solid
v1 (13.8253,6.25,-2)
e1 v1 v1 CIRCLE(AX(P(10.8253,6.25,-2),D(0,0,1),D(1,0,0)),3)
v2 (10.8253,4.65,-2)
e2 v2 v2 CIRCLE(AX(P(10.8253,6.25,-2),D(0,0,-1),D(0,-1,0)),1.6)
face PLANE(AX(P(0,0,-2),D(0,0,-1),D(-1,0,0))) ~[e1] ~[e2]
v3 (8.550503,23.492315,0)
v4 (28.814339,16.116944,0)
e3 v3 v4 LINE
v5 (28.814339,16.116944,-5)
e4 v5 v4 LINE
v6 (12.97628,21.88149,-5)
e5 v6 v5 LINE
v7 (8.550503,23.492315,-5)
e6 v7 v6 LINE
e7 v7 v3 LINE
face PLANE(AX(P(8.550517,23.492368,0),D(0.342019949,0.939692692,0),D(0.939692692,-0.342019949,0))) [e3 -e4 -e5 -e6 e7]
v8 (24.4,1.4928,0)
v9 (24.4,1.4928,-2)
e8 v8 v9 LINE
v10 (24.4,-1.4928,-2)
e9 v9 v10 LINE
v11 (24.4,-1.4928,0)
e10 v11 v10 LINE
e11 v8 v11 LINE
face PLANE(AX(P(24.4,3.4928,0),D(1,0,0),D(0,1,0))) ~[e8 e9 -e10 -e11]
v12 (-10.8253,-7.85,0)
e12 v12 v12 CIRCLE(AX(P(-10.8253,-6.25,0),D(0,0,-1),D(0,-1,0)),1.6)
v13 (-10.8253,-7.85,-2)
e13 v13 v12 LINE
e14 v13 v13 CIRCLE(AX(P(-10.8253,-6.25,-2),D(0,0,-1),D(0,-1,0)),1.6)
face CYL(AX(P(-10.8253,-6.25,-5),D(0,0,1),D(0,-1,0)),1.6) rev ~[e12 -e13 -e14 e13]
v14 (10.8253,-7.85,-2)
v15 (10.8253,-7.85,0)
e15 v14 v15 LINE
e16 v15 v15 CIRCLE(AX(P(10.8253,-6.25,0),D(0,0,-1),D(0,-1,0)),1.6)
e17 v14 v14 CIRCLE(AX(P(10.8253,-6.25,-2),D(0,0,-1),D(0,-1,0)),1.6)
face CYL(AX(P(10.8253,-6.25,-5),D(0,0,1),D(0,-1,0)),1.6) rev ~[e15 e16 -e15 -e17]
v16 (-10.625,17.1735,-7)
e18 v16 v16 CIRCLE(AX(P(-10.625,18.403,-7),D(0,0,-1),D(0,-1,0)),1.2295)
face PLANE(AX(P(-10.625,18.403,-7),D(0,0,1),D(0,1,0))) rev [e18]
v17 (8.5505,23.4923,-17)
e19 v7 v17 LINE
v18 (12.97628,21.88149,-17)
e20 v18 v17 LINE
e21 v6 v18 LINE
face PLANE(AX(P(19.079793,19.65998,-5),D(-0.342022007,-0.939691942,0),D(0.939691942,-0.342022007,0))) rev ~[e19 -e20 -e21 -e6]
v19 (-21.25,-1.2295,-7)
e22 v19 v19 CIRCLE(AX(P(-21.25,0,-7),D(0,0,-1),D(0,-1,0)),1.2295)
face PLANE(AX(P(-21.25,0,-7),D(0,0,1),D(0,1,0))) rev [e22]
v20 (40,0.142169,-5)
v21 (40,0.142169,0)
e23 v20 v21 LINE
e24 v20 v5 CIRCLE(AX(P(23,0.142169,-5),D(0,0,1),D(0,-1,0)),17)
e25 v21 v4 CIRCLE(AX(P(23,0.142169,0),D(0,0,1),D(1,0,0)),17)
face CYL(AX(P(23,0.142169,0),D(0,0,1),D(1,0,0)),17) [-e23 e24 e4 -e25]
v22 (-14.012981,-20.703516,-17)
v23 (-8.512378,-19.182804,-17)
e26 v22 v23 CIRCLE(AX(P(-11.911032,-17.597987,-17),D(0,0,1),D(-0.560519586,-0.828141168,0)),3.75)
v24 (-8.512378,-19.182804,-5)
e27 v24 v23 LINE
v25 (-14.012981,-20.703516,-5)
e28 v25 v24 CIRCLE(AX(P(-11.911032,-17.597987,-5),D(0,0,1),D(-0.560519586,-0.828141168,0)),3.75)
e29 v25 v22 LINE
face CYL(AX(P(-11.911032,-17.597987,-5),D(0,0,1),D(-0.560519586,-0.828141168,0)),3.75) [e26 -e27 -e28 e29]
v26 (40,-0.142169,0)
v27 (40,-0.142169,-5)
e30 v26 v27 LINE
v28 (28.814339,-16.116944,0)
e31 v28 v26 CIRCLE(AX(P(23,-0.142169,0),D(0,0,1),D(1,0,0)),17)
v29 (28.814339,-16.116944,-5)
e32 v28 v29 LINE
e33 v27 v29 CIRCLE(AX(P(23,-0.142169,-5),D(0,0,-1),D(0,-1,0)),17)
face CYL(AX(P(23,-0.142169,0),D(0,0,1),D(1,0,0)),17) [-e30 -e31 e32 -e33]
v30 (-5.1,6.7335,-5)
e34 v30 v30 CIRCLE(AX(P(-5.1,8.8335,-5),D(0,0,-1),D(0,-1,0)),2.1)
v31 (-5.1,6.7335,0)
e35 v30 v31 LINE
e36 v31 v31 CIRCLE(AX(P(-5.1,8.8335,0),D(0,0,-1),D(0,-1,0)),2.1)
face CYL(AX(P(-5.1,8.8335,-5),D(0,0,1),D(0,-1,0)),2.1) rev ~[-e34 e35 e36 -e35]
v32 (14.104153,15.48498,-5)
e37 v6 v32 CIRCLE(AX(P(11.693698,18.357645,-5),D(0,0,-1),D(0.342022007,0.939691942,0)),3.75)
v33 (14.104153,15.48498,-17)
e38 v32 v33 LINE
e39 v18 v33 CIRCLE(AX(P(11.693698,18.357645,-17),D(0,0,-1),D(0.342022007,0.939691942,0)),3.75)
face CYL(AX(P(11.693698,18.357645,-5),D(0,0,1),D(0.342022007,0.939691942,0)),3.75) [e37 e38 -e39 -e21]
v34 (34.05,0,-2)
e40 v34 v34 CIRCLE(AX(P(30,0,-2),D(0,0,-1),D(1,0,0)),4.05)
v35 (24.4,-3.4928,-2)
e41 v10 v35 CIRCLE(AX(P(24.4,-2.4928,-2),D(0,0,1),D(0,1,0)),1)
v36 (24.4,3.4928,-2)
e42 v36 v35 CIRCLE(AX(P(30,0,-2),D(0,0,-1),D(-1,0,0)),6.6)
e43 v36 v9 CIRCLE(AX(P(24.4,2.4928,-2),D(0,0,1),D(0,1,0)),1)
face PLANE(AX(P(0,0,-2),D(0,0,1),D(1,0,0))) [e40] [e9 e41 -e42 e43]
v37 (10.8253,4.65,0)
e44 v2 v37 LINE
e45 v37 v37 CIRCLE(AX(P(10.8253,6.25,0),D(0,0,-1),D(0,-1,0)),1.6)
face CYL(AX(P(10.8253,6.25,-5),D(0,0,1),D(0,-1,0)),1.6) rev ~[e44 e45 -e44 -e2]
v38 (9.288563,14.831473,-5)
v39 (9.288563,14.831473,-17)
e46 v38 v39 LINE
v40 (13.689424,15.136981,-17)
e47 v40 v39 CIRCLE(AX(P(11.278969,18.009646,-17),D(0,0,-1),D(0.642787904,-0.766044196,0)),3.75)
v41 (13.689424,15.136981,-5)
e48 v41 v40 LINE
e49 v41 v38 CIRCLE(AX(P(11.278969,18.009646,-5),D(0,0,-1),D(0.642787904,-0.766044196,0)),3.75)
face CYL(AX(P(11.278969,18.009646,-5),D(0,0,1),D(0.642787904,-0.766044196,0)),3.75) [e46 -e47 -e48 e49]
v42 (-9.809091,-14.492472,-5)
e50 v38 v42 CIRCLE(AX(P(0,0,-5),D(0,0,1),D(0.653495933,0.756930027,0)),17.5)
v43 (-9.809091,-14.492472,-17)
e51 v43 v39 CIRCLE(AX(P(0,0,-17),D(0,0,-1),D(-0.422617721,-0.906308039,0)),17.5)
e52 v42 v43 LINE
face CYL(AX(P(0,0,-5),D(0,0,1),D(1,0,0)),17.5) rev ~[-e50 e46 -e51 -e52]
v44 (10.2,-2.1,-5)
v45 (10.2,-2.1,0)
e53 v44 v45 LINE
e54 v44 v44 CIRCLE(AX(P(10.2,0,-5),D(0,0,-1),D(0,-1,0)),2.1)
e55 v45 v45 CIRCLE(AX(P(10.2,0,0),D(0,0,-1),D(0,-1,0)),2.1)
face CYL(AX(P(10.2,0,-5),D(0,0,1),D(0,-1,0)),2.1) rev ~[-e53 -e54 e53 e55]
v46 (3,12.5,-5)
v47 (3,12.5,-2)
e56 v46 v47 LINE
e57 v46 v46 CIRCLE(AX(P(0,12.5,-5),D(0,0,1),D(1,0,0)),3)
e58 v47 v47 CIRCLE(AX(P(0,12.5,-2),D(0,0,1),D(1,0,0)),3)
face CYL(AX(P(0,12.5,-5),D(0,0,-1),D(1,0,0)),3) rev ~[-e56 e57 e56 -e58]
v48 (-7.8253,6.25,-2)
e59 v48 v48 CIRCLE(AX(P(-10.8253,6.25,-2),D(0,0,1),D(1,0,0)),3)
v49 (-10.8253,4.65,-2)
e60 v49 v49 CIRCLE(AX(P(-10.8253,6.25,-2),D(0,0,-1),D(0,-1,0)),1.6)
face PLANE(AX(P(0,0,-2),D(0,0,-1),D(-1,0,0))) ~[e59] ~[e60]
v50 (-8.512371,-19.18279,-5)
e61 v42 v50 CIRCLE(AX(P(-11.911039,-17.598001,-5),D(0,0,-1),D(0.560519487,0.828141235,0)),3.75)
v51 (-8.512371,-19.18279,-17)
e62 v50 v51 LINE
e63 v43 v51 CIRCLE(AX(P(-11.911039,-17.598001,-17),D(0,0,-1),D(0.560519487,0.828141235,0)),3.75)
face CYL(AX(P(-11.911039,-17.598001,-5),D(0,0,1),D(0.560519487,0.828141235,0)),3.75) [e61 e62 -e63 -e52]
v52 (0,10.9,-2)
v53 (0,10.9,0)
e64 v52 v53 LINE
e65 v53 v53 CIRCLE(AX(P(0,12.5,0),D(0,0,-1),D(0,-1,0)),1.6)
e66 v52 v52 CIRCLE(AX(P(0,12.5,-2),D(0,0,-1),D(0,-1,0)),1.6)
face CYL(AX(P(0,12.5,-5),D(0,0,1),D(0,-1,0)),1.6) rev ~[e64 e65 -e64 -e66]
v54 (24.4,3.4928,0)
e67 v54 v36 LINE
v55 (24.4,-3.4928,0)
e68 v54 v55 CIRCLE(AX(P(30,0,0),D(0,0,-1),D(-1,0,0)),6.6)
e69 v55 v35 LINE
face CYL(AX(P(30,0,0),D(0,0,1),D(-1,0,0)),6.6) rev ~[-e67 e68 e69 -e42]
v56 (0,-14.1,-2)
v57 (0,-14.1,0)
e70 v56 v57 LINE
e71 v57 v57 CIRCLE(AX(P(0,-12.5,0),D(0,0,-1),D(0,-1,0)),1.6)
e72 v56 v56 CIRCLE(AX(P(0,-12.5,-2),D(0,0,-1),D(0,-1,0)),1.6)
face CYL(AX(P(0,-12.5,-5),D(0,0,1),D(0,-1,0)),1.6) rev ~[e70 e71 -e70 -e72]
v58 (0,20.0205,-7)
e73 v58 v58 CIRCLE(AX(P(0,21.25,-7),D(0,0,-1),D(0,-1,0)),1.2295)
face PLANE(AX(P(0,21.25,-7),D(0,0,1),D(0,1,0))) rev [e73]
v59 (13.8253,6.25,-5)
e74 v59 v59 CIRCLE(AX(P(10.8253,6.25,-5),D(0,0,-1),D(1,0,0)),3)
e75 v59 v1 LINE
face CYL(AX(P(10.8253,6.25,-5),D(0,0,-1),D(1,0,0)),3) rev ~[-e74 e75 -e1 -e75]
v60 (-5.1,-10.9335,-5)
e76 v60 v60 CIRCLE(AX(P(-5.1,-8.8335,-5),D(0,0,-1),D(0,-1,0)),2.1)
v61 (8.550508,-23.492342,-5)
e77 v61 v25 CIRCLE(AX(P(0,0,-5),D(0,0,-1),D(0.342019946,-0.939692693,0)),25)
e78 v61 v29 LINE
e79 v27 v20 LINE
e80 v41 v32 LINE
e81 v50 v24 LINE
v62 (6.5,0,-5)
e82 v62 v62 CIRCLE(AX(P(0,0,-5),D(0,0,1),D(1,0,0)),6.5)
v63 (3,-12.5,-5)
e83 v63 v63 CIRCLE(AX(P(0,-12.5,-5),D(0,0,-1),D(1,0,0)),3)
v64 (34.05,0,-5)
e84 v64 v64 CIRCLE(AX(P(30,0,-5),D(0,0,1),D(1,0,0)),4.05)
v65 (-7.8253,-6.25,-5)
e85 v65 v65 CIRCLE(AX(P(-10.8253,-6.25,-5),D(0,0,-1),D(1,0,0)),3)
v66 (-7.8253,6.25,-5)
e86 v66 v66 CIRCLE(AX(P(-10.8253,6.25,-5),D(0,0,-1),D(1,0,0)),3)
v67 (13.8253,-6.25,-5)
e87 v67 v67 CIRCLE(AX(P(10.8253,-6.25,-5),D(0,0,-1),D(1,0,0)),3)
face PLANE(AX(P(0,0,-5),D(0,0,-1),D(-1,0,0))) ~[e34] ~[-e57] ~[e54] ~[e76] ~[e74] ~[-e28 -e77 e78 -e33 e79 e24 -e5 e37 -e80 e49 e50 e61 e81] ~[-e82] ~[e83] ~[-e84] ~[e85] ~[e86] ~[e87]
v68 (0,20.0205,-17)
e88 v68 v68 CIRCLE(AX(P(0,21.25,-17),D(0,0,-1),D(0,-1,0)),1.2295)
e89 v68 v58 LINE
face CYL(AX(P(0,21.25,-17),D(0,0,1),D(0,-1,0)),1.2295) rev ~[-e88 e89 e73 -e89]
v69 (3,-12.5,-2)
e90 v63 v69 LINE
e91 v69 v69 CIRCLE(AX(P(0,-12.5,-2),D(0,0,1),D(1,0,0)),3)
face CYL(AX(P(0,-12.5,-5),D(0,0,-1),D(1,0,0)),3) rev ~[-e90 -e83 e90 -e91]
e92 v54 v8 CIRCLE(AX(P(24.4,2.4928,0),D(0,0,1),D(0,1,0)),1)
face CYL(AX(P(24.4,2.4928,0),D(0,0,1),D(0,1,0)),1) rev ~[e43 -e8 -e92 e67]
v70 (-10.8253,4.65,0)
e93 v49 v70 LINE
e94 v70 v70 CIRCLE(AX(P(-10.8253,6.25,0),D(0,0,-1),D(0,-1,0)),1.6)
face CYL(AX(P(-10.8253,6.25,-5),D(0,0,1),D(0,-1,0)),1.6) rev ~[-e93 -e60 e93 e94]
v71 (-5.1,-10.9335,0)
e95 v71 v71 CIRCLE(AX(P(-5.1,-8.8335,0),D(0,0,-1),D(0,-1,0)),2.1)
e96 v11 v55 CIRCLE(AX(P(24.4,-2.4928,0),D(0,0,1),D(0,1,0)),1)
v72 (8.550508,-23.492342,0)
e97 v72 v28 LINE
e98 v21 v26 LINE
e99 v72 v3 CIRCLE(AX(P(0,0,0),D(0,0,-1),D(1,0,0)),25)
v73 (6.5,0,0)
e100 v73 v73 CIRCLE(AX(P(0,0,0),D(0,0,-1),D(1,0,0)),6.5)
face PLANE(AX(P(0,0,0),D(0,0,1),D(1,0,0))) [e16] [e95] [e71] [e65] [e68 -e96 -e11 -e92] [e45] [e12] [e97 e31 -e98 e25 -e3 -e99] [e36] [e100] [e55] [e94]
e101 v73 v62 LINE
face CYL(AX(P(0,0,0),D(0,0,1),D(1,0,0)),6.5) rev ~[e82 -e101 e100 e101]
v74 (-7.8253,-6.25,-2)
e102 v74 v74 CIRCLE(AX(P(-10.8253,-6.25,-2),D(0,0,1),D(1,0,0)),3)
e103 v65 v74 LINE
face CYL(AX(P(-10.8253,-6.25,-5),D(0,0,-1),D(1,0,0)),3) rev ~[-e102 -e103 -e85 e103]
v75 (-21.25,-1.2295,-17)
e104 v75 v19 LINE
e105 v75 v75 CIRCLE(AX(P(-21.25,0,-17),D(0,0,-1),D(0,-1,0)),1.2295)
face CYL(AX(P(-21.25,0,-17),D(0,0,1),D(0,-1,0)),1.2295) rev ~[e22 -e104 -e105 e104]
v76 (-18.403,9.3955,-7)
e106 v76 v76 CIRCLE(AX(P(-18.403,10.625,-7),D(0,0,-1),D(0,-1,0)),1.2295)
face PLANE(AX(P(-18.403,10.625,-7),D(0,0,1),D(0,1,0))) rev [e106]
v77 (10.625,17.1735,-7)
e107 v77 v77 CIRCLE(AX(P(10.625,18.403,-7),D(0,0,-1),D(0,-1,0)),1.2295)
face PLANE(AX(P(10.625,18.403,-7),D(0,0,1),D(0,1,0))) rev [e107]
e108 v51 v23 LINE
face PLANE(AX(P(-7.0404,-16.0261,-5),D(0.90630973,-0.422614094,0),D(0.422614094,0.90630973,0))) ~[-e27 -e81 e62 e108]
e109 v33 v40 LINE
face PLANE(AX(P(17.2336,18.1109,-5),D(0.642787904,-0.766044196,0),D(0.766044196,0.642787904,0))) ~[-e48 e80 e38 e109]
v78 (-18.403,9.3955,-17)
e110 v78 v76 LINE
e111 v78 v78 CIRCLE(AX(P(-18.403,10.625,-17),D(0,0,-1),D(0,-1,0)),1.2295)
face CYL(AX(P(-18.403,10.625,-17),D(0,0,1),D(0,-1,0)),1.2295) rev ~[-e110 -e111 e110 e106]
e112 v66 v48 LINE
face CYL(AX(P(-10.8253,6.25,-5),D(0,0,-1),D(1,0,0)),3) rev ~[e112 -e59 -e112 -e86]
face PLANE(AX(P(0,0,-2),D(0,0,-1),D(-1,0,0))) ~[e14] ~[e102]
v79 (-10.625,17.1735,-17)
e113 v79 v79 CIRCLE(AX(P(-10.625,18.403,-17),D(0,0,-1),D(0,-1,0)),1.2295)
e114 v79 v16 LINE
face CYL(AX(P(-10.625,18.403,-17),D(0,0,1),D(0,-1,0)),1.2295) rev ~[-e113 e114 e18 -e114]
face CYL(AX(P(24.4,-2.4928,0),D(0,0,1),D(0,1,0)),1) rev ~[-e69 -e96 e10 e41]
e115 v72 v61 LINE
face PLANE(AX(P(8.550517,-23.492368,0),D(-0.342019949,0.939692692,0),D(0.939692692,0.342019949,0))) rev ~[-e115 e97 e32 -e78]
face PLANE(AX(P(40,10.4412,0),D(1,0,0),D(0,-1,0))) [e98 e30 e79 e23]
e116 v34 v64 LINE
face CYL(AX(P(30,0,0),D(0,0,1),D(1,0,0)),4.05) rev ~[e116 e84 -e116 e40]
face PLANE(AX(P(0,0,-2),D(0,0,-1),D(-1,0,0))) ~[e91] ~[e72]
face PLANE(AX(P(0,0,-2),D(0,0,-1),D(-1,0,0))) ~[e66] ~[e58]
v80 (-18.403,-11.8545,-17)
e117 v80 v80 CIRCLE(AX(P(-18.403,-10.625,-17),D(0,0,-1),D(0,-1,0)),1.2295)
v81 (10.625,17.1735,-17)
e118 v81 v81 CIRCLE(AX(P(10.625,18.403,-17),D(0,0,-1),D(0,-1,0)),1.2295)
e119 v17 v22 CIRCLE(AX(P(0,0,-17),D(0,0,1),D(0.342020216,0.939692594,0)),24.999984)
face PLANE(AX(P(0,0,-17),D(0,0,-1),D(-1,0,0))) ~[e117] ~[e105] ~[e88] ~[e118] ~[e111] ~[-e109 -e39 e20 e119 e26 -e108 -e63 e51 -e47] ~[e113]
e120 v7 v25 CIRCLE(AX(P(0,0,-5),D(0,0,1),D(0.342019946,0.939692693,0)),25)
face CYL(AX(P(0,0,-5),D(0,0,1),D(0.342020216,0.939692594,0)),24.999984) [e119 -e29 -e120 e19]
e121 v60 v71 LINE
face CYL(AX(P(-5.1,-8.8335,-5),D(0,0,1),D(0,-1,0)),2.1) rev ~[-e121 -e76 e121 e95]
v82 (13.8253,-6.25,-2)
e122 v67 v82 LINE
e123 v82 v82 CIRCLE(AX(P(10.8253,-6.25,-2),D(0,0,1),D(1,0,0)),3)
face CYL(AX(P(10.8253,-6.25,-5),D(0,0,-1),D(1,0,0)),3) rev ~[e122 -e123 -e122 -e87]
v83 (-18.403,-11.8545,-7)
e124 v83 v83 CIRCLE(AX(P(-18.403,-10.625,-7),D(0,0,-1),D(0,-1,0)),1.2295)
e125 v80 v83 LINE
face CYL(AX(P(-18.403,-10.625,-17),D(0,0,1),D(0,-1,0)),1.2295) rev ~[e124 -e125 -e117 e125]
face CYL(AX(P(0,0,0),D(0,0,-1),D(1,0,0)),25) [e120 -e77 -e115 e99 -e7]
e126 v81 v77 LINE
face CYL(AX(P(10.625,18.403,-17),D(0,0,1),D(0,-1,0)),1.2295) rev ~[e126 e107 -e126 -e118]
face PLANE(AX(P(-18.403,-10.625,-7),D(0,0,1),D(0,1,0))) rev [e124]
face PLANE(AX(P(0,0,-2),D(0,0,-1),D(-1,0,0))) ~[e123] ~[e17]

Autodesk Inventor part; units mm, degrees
ref_plane "YZ Plane" through (0, 0, 0) normal (1, 0, 0) x (0, 1, 0)
ref_plane "XZ Plane" through (0, 0, 0) normal (0, 1, 0) x (-1, 0, 0)
ref_plane "作業平面1" through (0, 0, 14) normal (0, 0, 1) x (-0.9659258, -0.258819, 0)
sketch "スケッチ14" plane through (0, 0, 0) normal (0, 0, 1) x (1, 0, 0)
  circle A0 centre (0, 0) radius 25
  circle A1 centre (30, 0) radius 4.05
  line L0 (0, 25) -> (40, 25)
  line L1 (40, 25) -> (40, -25)
  line L2 (40, -25) -> (0, -25)
  line L3 (0, -25) -> (0, 25)
  line L4 (0, -25) -> (40, -10.4412)
  line L5 (0, 25) -> (40, 10.4412)
  line L6 (0.5157, 26.4168) -> (40.5157, 11.858)
  line L7 (0.5157, -26.4168) -> (40.5157, -11.858)
  circle A2 centre (0, 0) radius 6.5
  line L8 (40.5157, -11.858) -> (63.847, -3.366)
  line L9 (37.8689, 40.3876) -> (23.4147, 35.1267)
  line L10 (23.4147, 35.1267) -> (-16.5853, 20.5679)
  line L11 (-16.5853, 20.5679) -> (-32.0428, 14.9418)
  line L12 (-32.0428, 14.9418) -> (-14.9418, -32.0428)
  line L13 (-14.9418, -32.0428) -> (0.5157, -26.4168)
  line L14 (40, 12.0456) -> (47.7428, -9.2275)
  line L15 (40, 12.0456) -> (30.6418, 37.7571)
  point P0 (8.5505, -23.4923)
  point P1 (40, -12.0456)
  point P2 (40, 12.0456)
  point P3 (8.5505, 23.4923)
  dimension "d111" = 50
  dimension "d112" = 8.1
  dimension "d113" = 30
  dimension "d114" = 40
  dimension "d115" = 50
  dimension "d116" = 25
  dimension "d119" = 25
  dimension "d126" = 20
  dimension "d127" = 20
  dimension "d144" = 13
  dimension "d201" = 90
  dimension "d202" = 90
extrude "押し出し9" add sketch "スケッチ14" along normal blind 5 contours A0 L4 L3 A2 L5 | A0 L5 L1 L4 | L5 A0 | A0 L6 L1 L5 | L4 L1 L7 A0 | A0 L4 | L3 A2 A0
sketch "スケッチ15" plane through (0, 0, 0) normal (0, 0, -1) x (-1, 0, 0)
  circle A0 centre (-30, 0) radius 4.05 projected
  circle A1 centre (-30, 0) radius 6.6
  line L0 (-24.4, 3.4928) -> (-24.4, -3.4928)
  arc A2 (-24.4, 1.4928) -> (-24.4, 3.4928) centre (-24.4, 2.4928) ccw
  arc A3 (-24.4, -3.4928) -> (-24.4, -1.4928) centre (-24.4, -2.4928) ccw
  point P0 (0, 0)
  dimension "d122" = 13.2
  dimension "d203" = 5.6
  dimension "d206" = 0
  dimension "d207" = 0
  dimension "d208" = 1
  dimension "d209" = 1
extrude "押し出し10" cut sketch "スケッチ15" against normal blind 2 contours L0 A1
sketch "スケッチ16" plane through (0, 0, 5) normal (0, 0, 1) x (1, 0, 0)
  circle A0 centre (30, 0) radius 4.05 projected
  circle A1 centre (30, 0) radius 17
  arc A2 (8.5505, 23.4923) -> (8.5505, -23.4923) centre (0, 0) ccw projected
  circle A3 centre (0, 0) radius 25
  line L0 (40, -12.0456) -> (40, 12.0456) projected
  line L1 (40, 12.0456) -> (-0.2187, 26.6841)
  line L2 (40, -12.0456) -> (-2.6962, -27.5858)
  circle A4 centre (0, 0) radius 17.5
  line L3 (8.5505, 23.4923) -> (5.9854, 16.4446)
  line L4 (-17.5, 0) -> (-25, 0)
  line L5 (-2.7839, 19.6364) -> (32.5, 6.7941)
  line L6 (32.5, 6.7941) -> (32.5, -6.7941)
  line L7 (32.5, -6.7941) -> (-5.2613, -20.5381)
  line L8 (17.9474, 20.0721) -> (15.3823, 13.0244)
  line L9 (-17.5, 0) -> (0, 0)
  line L10 (-13.6656, -12.9367) -> (-0.4151, -19.1155)
  line L11 (-7.0404, -16.0261) -> (-11.4484, -25.4792)
  line L12 (17.2336, 18.1109) -> (11.4362, 13.2463)
  line L13 (18.0185, 5.7516) -> (7.3857, 18.4233)
  line L14 (0, 25) -> (0, 10.5586)
  line L15 (17.2336, 18.1109) -> (19.0798, 19.66)
  point P0 (0, -25)
  point P1 (-11.8057, -12.918)
  point P2 (-10.2087, -22.8207)
  point P3 (-7.3958, -15.8604)
  dimension "d125" = 34
  dimension "d128" = 7.5
  dimension "d164" = 7.5
  dimension "d165" = 10
  dimension "d186" = 90
  dimension "d187" = 65
  dimension "d196" = 30
extrude "押し出し11" add sketch "スケッチ16" along normal blind 12 contours L12 L5 L3 A3 | A3 L1 L8 | L8 L1 L15 | L3 L5 L14 A2 | L12 L13 L5 | A2 L4 A4 L10 L11 | L14 A4 L4 A2 | L5 L13 L12 A4 | A4 L14 L5
sketch "スケッチ17" plane through (0, 0, 5) normal (0, 0, 1) x (1, 0, 0)
  circle A0 centre (30, 0) radius 4.05 projected
  line L0 (0, 0) -> (30, 0)
  circle A1 centre (0, 0) radius 12.5
  line L1 (0, 0) -> (12.4415, 7.1831)
  point P0 (10.8253, 6.25)
  point P1 (0, 12.5)
  point P2 (-10.8253, 6.25)
  point P3 (-10.8253, -6.25)
  point P4 (0, -12.5)
  point P5 (10.8253, -6.25)
  dimension "d131" = 25
  dimension "d132" = 30
  dimension "d135" = 360
hole "穴5" at (10.8253, 6.25, 5) at (0, 12.5, 5) at (-10.8253, 6.25, 5) at (-10.8253, -6.25, 5) at (0, -12.5, 5) at (10.8253, -6.25, 5) direction (0, 0, -1) diameter 3.2 end through all
sketch "スケッチ18" plane through (0, 0, 5) normal (0, 0, 1) x (1, 0, 0)
  circle A0 centre (30, 0) radius 4.05 projected
  line L0 (0, 0) -> (30, 0)
  circle A1 centre (0, 0) radius 10.2
  point P0 (10.2, 0)
  point P1 (-5.1, 8.8335)
  point P2 (-5.1, -8.8335)
  dimension "d145" = 20.4
  dimension "d148" = 360
hole "穴6" at (10.2, 0, 5) at (-5.1, 8.8335, 5) at (-5.1, -8.8335, 5) direction (0, 0, -1) diameter 4.2 end through all
sketch "スケッチ19" plane through (0, 0, 5) normal (0, 0, 1) x (1, 0, 0)
  circle A0 centre (0, 12.5) radius 1.6 projected
  circle A1 centre (0, 0) radius 12.5
  circle A2 centre (0, 12.5) radius 3
  circle A3 centre (-10.8253, 6.25) radius 3
  circle A4 centre (-10.8253, -6.25) radius 3
  circle A5 centre (0, -12.5) radius 3
  circle A6 centre (10.8253, -6.25) radius 3
  circle A7 centre (10.8253, 6.25) radius 3
  dimension "d157" = 6
  dimension "d160" = 360
extrude "押し出し12" cut sketch "スケッチ19" against normal blind 3 contours A0 A1 | A0 A1 A2 | A1 A0 | A0 A1 A2 | A3 A1 | A1 A3 | A7 A1 | A1 A7 | A4 A1 | A1 A4 | A6 A1 | A1 A6 | A5 A1 | A1 A5
sketch "スケッチ20" plane through (0, 0, 17) normal (0, 0, 1) x (1, 0, 0)
  line L0 (19.0798, 19.66) -> (8.5505, 23.4923) projected
  line L1 (17.9474, 20.0721) -> (15.3823, 13.0244)
  line L2 (15.3823, 13.0244) -> (5.9854, 16.4446)
  line L3 (5.9854, 16.4446) -> (8.5505, 23.4923)
  line L4 (0, 0) -> (0, 30.7788)
  circle A0 centre (0, 0) radius 21.25
  circle A1 centre (0, 0) radius 25
  point P0 (11.9664, 18.2584)
  point P1 (0, 21.25)
  point P2 (-10.625, 18.403)
  point P3 (-18.403, 10.625)
  point P4 (-21.25, 0)
  point P5 (-18.403, -10.625)
  point P6 (-10.625, -18.403)
  point P7 (0, -21.25)
  point P8 (10.625, -18.403)
  point P9 (18.403, -10.625)
  point P10 (21.25, 0)
  point P11 (18.403, 10.625)
  point P12 (10.625, 18.403)
  dimension "d167" = 7.5
  dimension "d168" = 5
  dimension "d169" = 3.75
  dimension "d170" = 3.75
  dimension "d171" = 50
  dimension "d174" = 360
hole "穴7" at (10.625, 18.403, 17) at (0, 21.25, 17) at (-10.625, 18.403, 17) at (-18.403, 10.625, 17) direction (0, 0, -1) diameter 2.459 depth 10 thread size "M3x0.5" class "6H" standard "ISO Metric profile"
fillet "フィレット9" radius 17 2 edges at (40, 12.0456, 2.5) (40, -12.0456, 2.5)
sketch "スケッチ21" plane through (0, 0, 17) normal (0, 0, 1) x (1, 0, 0)
  circle A0 centre (-18.403, 10.625) radius 1.2295 projected
  circle A1 centre (0, 0) radius 21.25
  line L0 (0, 0) -> (-31.1052, 0)
  point P0 (-21.25, 0)
  point P1 (-18.403, -10.625)
hole "穴8" at (-21.25, 0, 17) at (-18.403, -10.625, 17) direction (0, 0, -1) diameter 2.459 depth 10 thread size "M3x0.5" class "6H" standard "ISO Metric profile"
fillet "フィレット12" radius 3.75 4 edges at (-7.0404, -16.0261, 11) (-10.2087, -22.8207, 11) (19.0798, 19.66, 11) (11.4362, 13.2463, 11)
mirror "ミラー1" about plane through (0, 0, 0) normal (0, 0, 1)
sketch "スケッチ22" plane through (0, 0, 17) normal (0, 0, 1) x (1, 0, 0)
  line L0 (-52.2093, 35.4502) -> (60.0334, 35.4502)
  line L1 (60.0334, 35.4502) -> (60.0334, -31.2)
  line L2 (60.0334, -31.2) -> (-52.2093, -31.2)
  line L3 (-52.2093, -31.2) -> (-52.2093, 35.4502)
  point P0 (0, 0)
extrude "押し出し13" cut sketch "スケッチ22" against normal blind 17
sketch "スケッチ23" plane through (0, 0, 0) normal (0, 0, 1) x (1, 0, 0)
  line L0 (24.4, 3.4928) -> (24.4, -3.4928) projected
  arc A0 (24.4, 3.4928) -> (24.4, 1.4928) centre (24.4, 2.4928) ccw
  arc A1 (24.4, -1.4928) -> (24.4, -3.4928) centre (24.4, -2.4928) ccw
  point P0 (0, 0)
  dimension "d210" = 0
  dimension "d211" = 1
  dimension "d212" = 0
  dimension "d213" = 1
extrude "押し出し14" cut sketch "スケッチ23" against normal blind 2
properties part number "RP_Thigh-Base_MIR" material "アルミニウム 6061"
